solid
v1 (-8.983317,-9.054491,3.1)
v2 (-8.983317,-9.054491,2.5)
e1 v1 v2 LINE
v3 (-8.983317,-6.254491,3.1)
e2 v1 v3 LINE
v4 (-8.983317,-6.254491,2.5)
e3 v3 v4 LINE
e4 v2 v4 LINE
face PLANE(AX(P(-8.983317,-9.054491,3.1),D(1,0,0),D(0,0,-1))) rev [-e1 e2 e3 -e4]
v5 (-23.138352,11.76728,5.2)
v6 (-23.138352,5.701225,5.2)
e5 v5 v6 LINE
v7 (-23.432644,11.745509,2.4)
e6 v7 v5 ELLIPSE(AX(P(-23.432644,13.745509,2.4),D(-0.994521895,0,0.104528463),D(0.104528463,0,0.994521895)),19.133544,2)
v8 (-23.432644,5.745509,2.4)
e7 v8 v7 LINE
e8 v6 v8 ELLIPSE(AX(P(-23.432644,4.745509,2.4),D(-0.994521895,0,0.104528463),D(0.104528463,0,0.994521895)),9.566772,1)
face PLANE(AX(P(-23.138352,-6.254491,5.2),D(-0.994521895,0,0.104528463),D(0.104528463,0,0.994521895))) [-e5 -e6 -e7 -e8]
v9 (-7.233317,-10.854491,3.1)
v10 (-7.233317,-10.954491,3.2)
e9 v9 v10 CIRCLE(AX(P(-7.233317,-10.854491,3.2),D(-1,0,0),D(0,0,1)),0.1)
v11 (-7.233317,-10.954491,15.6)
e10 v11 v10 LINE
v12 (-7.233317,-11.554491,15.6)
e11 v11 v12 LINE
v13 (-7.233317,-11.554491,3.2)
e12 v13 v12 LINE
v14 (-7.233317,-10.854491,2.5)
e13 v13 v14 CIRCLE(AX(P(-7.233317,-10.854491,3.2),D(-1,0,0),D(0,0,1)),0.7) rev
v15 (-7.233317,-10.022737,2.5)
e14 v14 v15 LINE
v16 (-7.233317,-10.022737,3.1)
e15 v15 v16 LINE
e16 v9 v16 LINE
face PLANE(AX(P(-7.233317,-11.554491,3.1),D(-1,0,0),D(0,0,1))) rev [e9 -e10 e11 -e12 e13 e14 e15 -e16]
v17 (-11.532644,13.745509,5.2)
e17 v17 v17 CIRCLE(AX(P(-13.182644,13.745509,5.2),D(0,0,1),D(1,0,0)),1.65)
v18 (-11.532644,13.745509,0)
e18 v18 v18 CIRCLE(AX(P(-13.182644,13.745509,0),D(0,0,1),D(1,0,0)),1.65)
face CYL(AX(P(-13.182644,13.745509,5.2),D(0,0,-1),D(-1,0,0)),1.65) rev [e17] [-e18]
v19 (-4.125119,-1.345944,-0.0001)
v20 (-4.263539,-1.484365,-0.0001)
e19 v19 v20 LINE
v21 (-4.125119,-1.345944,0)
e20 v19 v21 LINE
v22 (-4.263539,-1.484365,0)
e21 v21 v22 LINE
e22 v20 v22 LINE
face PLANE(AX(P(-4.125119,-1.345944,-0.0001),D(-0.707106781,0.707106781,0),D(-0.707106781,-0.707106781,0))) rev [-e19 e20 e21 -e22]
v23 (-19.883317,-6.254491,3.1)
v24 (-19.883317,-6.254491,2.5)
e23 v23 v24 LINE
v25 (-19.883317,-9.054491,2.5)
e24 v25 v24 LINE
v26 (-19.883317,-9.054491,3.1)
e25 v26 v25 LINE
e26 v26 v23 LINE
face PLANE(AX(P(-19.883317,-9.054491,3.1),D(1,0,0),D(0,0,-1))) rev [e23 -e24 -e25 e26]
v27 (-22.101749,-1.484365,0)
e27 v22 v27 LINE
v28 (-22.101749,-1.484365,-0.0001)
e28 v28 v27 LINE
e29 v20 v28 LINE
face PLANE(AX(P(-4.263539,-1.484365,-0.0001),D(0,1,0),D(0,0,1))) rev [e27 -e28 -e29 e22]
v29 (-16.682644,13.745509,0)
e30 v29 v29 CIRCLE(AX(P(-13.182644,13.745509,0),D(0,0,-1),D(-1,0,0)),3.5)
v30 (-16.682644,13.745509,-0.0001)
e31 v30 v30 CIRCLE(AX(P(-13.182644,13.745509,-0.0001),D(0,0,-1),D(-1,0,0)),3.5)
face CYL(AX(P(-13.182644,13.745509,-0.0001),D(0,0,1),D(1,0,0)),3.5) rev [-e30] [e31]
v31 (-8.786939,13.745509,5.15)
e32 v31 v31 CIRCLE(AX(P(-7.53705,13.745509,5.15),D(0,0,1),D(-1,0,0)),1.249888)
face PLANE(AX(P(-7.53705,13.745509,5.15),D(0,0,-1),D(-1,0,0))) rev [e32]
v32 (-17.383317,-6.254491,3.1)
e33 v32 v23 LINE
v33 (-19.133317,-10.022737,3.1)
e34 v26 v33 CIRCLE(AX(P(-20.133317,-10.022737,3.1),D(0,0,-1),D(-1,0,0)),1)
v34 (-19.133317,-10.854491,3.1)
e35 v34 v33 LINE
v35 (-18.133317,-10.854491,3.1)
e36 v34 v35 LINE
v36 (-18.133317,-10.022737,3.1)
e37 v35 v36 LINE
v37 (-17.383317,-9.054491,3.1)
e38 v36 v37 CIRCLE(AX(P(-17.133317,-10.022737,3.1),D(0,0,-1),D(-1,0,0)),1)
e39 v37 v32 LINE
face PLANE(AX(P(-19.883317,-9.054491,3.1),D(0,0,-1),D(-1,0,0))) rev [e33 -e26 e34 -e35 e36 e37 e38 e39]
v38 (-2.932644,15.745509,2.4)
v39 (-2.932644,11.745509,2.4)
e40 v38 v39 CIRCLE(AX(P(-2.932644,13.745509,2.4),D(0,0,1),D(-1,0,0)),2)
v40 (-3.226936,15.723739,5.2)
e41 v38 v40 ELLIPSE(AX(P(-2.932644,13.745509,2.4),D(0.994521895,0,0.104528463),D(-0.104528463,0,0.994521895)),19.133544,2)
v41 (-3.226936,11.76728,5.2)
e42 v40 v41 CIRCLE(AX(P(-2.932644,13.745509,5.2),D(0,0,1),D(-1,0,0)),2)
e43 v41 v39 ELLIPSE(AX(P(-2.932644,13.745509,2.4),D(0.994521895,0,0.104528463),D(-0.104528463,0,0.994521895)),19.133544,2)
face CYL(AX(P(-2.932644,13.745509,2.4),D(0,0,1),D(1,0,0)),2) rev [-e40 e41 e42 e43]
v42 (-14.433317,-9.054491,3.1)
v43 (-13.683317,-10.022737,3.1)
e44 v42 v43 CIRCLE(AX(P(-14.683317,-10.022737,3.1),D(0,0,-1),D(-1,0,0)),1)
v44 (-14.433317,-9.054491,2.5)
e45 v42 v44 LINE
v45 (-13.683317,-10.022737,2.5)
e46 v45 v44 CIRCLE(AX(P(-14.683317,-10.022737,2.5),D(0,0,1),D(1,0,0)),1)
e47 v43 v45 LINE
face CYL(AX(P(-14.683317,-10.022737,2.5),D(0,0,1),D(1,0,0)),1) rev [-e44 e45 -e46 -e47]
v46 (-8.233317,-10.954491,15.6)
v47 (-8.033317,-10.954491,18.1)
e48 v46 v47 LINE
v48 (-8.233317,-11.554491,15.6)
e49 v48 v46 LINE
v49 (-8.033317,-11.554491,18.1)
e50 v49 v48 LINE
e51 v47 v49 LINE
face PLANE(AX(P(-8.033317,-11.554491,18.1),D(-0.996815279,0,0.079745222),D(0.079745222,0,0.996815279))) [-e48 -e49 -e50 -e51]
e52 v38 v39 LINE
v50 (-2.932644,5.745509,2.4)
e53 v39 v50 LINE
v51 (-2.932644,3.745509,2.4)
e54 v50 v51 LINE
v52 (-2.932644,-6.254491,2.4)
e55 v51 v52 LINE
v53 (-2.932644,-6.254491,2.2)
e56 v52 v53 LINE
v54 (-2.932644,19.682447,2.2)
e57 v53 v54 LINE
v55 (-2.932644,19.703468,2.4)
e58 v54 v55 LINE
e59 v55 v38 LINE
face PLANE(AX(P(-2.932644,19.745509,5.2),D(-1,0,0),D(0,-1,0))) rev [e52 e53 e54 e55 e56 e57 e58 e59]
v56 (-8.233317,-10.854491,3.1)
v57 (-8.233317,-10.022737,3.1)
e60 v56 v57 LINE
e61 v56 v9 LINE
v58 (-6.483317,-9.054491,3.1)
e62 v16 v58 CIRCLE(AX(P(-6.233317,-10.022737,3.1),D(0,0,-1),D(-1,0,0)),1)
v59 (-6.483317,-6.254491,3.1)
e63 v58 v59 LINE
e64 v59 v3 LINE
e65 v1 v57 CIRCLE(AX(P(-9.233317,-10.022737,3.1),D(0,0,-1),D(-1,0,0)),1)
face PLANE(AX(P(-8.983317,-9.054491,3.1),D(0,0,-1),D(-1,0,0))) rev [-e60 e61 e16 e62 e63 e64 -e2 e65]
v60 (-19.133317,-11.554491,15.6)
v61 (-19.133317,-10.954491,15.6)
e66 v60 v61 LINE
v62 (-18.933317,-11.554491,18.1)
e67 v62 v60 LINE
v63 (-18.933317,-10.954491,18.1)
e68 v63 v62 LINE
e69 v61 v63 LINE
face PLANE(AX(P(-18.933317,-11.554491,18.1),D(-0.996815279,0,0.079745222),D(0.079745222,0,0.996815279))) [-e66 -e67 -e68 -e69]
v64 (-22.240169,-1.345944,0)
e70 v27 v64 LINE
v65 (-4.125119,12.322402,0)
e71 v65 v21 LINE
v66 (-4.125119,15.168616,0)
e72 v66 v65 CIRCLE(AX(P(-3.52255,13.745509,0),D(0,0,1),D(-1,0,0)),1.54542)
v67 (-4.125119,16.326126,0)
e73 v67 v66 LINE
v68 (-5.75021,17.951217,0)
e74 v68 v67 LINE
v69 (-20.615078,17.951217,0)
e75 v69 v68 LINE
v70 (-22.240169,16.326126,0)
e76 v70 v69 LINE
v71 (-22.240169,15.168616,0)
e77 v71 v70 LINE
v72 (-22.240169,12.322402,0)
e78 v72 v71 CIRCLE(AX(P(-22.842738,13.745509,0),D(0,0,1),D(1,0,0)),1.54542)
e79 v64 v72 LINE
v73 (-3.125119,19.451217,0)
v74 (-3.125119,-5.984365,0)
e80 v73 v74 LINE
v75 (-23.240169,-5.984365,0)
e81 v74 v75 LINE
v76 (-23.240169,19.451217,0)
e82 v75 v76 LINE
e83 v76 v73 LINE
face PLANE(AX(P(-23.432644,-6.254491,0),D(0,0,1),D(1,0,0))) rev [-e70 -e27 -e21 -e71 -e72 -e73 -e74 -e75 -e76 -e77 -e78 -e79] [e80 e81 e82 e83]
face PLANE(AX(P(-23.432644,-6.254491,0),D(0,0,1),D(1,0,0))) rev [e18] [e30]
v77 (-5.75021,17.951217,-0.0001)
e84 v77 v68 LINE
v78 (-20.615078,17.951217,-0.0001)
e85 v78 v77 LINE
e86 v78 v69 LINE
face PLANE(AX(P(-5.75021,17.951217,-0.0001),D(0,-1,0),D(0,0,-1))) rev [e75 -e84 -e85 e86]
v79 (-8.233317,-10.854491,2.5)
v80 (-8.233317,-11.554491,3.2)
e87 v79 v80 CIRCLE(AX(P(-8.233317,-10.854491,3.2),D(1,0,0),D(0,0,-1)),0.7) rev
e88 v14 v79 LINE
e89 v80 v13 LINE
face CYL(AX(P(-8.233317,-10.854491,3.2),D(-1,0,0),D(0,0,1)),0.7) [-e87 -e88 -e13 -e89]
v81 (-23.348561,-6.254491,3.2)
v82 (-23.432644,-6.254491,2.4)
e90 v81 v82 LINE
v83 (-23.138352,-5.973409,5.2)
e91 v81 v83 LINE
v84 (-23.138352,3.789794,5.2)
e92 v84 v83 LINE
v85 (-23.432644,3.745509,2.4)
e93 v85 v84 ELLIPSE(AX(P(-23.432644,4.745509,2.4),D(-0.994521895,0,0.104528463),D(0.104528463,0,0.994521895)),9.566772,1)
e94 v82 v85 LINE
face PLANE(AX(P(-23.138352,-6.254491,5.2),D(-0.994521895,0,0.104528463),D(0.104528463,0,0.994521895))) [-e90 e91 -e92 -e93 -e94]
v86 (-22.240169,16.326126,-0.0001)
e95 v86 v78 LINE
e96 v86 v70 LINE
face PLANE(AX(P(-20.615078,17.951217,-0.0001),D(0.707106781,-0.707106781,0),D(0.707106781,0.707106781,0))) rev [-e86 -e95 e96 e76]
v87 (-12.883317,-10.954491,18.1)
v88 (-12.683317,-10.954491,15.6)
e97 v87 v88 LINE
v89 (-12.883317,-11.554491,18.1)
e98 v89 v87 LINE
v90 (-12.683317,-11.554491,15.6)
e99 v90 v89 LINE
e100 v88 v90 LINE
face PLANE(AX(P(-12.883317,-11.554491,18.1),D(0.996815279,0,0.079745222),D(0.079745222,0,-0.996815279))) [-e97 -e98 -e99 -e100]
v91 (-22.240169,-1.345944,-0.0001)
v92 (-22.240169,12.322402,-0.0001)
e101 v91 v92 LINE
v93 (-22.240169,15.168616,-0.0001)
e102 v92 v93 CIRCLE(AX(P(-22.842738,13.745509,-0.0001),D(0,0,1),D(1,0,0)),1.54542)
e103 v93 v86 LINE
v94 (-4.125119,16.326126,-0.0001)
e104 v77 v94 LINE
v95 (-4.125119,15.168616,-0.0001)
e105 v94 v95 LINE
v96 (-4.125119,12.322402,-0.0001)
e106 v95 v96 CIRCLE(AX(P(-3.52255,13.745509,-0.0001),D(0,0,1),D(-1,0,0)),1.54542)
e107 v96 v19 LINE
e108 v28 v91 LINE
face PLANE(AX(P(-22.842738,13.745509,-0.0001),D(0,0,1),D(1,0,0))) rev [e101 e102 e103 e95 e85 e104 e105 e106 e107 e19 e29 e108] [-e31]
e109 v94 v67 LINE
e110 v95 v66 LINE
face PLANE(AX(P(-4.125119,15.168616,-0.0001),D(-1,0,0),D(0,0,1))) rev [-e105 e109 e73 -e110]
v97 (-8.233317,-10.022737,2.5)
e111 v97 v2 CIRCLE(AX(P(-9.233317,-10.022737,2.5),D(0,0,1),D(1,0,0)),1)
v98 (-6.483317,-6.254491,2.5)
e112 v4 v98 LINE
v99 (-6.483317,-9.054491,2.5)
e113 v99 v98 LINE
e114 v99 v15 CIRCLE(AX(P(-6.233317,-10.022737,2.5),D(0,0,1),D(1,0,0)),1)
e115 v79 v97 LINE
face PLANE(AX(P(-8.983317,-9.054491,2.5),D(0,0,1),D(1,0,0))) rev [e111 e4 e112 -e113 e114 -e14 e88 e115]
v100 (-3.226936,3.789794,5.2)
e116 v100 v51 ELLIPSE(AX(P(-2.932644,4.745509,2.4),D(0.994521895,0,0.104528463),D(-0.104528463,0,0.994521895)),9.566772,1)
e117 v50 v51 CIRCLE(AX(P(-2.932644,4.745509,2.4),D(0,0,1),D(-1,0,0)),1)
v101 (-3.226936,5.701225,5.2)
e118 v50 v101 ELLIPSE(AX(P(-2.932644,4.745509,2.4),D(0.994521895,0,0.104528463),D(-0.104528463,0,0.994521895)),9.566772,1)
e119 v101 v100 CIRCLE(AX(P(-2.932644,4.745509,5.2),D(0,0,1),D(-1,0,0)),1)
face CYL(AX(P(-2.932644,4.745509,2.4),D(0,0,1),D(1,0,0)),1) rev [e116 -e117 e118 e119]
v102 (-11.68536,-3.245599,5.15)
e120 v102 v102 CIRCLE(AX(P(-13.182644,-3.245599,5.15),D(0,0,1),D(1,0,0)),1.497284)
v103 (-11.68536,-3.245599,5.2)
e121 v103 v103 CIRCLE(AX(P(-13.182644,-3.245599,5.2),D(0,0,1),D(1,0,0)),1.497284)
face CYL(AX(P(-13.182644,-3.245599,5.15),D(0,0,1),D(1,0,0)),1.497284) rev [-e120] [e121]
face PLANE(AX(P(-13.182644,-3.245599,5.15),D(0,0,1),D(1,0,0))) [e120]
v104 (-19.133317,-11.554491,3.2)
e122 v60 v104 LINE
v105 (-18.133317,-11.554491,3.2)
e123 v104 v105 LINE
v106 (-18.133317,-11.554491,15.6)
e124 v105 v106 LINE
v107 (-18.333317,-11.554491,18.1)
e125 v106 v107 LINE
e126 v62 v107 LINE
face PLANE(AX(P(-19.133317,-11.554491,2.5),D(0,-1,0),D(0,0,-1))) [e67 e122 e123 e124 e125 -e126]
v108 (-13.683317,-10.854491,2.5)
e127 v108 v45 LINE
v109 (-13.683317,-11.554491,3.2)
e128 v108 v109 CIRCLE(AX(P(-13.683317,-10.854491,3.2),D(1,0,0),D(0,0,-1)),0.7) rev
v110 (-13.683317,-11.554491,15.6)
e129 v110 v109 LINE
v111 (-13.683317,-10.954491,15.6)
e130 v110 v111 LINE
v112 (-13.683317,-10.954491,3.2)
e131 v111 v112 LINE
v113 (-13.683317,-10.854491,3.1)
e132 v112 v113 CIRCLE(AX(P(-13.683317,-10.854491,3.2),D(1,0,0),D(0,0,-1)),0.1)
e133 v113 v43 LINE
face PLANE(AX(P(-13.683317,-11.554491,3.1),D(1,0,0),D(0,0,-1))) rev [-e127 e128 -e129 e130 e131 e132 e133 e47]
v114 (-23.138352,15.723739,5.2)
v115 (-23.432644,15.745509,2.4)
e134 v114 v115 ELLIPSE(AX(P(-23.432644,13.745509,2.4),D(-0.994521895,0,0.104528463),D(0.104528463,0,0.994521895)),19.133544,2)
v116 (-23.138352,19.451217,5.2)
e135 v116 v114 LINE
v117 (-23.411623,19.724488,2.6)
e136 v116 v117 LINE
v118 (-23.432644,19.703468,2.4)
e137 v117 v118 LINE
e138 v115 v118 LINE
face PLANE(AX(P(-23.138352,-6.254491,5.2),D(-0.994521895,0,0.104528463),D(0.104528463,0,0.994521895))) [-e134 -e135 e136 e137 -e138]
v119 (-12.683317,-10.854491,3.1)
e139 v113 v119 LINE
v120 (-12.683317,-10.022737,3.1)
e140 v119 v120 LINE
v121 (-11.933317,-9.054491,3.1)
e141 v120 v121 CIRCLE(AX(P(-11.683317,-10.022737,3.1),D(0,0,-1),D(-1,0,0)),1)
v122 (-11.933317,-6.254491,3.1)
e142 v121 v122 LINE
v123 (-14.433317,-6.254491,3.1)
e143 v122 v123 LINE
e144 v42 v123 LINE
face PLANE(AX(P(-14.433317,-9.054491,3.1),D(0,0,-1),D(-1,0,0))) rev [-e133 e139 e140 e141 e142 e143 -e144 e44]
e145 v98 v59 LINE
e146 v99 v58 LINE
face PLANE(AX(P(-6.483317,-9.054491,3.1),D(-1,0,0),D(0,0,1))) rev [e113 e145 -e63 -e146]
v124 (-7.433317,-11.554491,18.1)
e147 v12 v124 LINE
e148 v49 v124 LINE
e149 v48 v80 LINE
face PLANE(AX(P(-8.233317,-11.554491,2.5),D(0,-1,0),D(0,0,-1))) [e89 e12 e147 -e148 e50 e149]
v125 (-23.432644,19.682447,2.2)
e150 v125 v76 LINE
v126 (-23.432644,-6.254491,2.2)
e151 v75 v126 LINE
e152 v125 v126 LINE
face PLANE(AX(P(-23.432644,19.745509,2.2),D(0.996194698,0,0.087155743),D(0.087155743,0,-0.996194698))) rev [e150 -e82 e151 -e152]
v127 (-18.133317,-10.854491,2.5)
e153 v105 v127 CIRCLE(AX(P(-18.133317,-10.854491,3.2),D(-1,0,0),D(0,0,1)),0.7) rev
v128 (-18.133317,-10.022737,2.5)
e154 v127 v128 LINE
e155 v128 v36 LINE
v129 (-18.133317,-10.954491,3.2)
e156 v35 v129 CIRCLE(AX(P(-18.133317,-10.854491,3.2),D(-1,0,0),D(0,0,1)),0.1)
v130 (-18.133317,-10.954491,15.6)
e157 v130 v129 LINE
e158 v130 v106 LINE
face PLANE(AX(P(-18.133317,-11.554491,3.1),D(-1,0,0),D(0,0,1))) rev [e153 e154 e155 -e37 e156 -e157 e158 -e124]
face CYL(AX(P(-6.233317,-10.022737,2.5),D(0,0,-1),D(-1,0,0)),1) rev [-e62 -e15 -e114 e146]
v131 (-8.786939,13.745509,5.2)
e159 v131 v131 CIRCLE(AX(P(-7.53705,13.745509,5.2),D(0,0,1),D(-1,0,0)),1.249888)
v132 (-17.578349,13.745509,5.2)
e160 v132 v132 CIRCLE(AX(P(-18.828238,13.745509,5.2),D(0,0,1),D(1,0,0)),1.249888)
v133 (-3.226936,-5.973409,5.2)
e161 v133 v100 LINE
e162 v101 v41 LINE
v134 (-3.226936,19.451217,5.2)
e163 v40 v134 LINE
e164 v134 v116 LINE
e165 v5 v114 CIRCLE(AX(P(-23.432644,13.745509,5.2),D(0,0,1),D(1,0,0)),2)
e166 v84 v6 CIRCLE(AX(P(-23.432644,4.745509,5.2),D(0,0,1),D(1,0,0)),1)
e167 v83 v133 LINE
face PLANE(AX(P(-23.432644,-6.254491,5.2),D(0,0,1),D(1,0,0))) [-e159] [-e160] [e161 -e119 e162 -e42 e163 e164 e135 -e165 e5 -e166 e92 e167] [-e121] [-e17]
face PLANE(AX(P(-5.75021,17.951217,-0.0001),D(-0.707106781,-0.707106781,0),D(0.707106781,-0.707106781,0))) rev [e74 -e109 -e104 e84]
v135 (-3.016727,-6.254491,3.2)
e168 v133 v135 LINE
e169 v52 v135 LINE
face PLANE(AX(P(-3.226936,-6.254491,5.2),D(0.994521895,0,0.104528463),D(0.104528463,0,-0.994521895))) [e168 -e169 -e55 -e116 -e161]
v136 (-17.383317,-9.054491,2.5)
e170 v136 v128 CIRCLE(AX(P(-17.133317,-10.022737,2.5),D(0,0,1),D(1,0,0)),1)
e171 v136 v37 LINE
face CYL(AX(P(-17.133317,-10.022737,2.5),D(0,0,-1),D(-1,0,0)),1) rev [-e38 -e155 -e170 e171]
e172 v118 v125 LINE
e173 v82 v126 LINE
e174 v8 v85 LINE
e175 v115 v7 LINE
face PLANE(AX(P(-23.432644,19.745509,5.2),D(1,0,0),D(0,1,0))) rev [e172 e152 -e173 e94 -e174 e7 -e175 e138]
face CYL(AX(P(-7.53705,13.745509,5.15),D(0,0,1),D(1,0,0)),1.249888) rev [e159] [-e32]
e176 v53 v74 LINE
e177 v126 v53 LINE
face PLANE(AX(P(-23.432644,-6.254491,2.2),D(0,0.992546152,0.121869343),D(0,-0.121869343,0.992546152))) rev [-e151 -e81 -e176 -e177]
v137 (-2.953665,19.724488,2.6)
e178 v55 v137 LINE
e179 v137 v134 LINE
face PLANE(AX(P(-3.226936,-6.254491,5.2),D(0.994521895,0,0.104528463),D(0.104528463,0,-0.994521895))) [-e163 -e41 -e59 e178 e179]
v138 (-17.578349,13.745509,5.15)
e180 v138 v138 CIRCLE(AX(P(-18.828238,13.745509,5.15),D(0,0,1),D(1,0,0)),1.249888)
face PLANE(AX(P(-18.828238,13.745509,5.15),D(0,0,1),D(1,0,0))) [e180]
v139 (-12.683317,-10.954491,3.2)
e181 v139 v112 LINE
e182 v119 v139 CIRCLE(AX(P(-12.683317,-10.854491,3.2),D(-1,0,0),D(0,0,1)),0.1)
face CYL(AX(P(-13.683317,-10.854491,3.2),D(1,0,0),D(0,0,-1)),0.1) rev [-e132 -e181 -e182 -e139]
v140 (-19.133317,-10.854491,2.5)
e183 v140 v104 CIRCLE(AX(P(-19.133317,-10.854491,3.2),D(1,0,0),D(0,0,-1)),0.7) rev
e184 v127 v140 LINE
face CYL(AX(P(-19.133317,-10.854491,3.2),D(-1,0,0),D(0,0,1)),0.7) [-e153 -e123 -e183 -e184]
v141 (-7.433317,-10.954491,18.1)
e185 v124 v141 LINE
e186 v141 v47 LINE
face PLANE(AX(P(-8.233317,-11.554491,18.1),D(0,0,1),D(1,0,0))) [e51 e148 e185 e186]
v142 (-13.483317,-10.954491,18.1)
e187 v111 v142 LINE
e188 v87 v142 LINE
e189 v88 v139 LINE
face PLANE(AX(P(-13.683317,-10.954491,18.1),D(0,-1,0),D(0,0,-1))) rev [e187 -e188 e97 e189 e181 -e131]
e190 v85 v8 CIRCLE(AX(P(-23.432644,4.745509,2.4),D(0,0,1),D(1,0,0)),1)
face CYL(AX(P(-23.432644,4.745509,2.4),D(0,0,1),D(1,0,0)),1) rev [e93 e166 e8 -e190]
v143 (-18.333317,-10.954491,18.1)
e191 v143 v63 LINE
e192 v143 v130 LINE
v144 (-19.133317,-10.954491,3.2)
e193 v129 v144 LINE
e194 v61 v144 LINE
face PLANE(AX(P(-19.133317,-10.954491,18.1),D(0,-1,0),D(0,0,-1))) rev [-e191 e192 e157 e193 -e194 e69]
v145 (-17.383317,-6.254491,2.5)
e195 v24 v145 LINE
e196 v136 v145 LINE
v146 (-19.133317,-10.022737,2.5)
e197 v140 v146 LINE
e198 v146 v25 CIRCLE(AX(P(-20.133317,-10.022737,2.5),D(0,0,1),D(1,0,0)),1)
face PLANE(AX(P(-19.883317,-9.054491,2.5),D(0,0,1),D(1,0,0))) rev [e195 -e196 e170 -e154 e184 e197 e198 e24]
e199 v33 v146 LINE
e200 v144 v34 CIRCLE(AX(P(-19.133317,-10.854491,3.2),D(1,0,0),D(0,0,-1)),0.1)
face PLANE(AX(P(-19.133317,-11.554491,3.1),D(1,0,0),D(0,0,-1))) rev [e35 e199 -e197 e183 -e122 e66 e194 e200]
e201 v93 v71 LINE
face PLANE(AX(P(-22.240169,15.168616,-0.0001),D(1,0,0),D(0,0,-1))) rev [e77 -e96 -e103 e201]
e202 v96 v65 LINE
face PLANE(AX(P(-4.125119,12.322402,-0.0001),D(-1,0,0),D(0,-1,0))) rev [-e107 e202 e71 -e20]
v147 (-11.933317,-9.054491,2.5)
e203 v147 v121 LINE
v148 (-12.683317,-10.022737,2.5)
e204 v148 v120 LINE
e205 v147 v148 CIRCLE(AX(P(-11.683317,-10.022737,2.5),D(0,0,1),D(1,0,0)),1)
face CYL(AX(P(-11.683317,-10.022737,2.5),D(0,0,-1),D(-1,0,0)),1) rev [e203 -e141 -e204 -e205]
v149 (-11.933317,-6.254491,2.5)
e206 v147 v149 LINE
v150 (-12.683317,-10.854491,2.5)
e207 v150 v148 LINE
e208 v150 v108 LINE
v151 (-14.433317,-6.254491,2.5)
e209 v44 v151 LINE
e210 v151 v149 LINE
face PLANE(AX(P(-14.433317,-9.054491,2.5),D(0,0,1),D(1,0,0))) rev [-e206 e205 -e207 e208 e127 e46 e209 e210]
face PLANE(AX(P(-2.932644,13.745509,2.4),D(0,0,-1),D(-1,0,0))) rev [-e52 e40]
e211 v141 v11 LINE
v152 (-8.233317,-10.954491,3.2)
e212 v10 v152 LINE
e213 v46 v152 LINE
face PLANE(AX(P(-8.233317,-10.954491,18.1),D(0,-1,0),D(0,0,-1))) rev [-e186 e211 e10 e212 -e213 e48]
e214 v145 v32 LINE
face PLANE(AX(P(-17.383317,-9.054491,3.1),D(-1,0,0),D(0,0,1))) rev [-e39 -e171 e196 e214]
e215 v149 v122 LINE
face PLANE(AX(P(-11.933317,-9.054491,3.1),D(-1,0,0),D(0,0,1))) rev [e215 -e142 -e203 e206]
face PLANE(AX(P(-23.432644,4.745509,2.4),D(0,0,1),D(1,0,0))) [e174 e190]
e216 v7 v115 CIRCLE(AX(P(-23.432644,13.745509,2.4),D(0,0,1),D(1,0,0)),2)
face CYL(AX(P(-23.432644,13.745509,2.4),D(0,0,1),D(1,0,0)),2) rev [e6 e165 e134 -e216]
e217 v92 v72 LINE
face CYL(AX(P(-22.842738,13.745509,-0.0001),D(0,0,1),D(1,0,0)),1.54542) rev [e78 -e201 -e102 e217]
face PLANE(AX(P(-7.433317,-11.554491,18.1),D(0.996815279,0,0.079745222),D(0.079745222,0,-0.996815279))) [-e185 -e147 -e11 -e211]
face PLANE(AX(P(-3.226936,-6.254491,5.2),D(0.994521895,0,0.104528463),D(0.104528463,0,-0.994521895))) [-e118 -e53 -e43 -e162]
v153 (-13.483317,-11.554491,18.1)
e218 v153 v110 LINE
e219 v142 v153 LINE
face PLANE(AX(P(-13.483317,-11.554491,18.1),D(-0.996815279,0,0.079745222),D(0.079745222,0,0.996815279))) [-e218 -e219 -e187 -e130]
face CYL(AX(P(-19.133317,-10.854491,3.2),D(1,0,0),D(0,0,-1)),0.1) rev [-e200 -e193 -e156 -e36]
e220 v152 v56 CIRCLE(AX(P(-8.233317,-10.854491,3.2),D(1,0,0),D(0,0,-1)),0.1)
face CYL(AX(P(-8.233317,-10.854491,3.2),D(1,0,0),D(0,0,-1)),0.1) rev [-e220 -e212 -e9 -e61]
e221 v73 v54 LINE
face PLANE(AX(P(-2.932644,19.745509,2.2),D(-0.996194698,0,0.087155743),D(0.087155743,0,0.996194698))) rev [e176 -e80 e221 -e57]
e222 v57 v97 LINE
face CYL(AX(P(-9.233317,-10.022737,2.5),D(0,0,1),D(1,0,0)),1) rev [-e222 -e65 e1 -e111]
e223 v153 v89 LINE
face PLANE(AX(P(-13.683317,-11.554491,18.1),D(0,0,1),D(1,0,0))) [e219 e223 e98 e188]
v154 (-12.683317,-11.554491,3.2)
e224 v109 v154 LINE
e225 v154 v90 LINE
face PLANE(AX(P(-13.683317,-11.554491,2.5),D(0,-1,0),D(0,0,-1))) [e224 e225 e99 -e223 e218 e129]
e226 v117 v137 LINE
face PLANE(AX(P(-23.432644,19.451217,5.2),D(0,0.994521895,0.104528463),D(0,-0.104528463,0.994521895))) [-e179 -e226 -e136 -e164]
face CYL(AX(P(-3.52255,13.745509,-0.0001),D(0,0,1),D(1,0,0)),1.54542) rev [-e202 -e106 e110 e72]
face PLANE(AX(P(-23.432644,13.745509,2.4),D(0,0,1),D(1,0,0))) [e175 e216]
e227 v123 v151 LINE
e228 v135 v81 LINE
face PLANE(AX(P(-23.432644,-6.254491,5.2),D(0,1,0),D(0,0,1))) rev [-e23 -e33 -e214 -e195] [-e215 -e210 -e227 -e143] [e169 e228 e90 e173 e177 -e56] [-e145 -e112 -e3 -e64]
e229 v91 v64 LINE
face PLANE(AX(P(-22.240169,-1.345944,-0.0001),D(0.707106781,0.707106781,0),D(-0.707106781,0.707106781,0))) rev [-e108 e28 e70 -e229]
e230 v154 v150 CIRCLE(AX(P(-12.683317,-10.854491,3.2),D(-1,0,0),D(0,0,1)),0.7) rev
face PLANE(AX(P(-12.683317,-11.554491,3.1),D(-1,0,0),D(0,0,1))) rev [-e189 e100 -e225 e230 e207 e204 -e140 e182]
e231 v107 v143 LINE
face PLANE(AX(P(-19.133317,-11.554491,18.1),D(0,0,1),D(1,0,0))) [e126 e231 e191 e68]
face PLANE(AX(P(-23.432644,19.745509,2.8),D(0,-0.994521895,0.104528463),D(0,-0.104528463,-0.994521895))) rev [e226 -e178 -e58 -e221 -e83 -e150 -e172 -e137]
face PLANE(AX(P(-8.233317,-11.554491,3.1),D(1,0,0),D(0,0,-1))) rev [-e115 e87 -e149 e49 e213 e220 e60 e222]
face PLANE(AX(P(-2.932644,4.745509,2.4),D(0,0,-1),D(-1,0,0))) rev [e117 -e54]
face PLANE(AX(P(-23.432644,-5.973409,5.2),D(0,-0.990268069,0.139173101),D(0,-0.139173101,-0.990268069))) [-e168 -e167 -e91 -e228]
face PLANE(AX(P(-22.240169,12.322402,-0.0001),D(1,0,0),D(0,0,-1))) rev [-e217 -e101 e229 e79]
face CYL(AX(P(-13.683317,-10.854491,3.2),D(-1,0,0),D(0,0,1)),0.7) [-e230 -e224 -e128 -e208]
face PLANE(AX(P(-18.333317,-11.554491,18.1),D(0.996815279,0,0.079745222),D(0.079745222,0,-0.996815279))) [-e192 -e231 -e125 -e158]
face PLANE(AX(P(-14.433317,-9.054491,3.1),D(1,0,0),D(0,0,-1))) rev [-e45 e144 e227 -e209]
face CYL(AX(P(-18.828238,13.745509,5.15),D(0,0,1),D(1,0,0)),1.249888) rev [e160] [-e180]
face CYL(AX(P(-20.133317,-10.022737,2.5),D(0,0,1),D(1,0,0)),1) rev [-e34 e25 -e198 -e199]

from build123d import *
from OCP.BRepFilletAPI import BRepFilletAPI_MakeChamfer

# Parameters (mm, degrees)
SZKIC1_W                                = 20.5
SZKIC1_H                                = 26
SZKIC1_R                                = 1.65
DODANIE_WYCI_GNI_CIE1_DEPTH             = 5.2
SZKIC2_R                                = 2
SZKIC2_R_2                              = 1
WYTNIJ_WYCI_GNI_CIE1_DEPTH              = 2.8
SZKIC4_W                                = 2.5
SZKIC4_H                                = 0.6
DODANIE_WYCI_GNI_CIE2_DEPTH             = 2.8
SZKIC7_W                                = 1
SZKIC7_H                                = 0.6
DODANIE_WYCI_GNI_CIE3_DEPTH             = 2.5
ZAOKR_GLENIE2_R                         = 1
SFAZOWANIE3_SIZE                        = 2.2
SFAZOWANIE3_SIZE2                       = 0.19247506
SFAZOWANIE4_SIZE                        = 2.8
SFAZOWANIE4_SIZE2                       = 0.294291859
SFAZOWANIE5_SIZE                        = 0.294291859
SFAZOWANIE5_SIZE_2                      = 2.8
SFAZOWANIE6_SIZE                        = 2.2
SFAZOWANIE6_SIZE2                       = 0.270126034
SFAZOWANIE7_SIZE                        = 2
SFAZOWANIE7_SIZE2                       = 0.281081669
SKETCH_1_W                              = 1
SKETCH_1_H                              = 0.6
EXTRUDE_1_DEPTH                         = 15
FILLET_1_R                              = 0.1
FILLET_2_R                              = 0.7
CHAMFER_1_SIZE                          = 2.5
CHAMFER_1_SIZE2                         = 0.2
PATTERN_LINEAR_9_COUNT                  = 2
PATTERN_LINEAR_9_PITCH                  = 5.45
ZAOKR_GLENIE2_OF_PATTERN_LINEAR_9_R     = 1
FILLET_1_OF_PATTERN_LINEAR_9_R          = 0.1
FILLET_2_OF_PATTERN_LINEAR_9_R          = 0.7
CHAMFER_1_OF_PATTERN_LINEAR_9_SIZE      = 2.5
CHAMFER_1_OF_PATTERN_LINEAR_9_SIZE2     = 0.2
PATTERN_LINEAR_9_COL_COUNT              = 2
PATTERN_LINEAR_9_COL_PITCH              = 5.45
ZAOKR_GLENIE2_OF_PATTERN_LINEAR_9_COL_R = 1
FILLET_1_OF_PATTERN_LINEAR_9_COL_R      = 0.1
FILLET_2_OF_PATTERN_LINEAR_9_COL_R      = 0.7
CHAMFER_1_OF_PATTERN_LINEAR_9_COL_SIZE  = 2.5
CHAMFER_1_OF_PATTERN_LINEAR_9_COL_SIZE2 = 0.2
SKETCH_4_R                              = 3.5
EXTRUDE_3_DEPTH                         = 0.0001
SKETCH_5_R                              = 1.249888398
SKETCH_5_R_2                            = 1.497284422
CUT_EXTRUDE_1_DEPTH                     = 0.05


with BuildPart() as part:
    # Szkic1 → Dodanie-wyciągnięcie1 (new body)
    with BuildSketch(Plane.XY):
        with Locations((-13.182644045, 6.74550931)):
            Rectangle(SZKIC1_W, SZKIC1_H)
        with Locations((-13.182644045, 13.74550931)):
            Circle(SZKIC1_R, mode=Mode.SUBTRACT)
    extrude(amount=DODANIE_WYCI_GNI_CIE1_DEPTH)

    # Szkic2 → Wytnij-wyciągnięcie1 (cut)
    with BuildSketch(Plane.XY.offset(5.2)):
        with Locations((-23.432644045, 13.74550931)):
            Circle(SZKIC2_R)
        with Locations((-2.932644045, 13.74550931)):
            Circle(SZKIC2_R)
        with Locations((-23.432644045, 4.74550931)):
            Circle(SZKIC2_R_2)
        with Locations((-2.932644045, 4.74550931)):
            Circle(SZKIC2_R_2)
    extrude(amount=-WYTNIJ_WYCI_GNI_CIE1_DEPTH, mode=Mode.SUBTRACT)

    # Szkic4 → Dodanie-wyciągnięcie2 (add)
    with BuildSketch(Plane.XZ.offset(6.25449069)):
        with Locations((-13.183317029, 2.8)):
            Rectangle(SZKIC4_W, SZKIC4_H)
    dodanie_wyci_gni_cie2 = extrude(amount=DODANIE_WYCI_GNI_CIE2_DEPTH)

    # Szkic7 → Dodanie-wyciągnięcie3 (add)
    with BuildSketch(Plane.XZ.offset(9.05449069)):
        with Locations((-13.183317029, 2.8)):
            Rectangle(SZKIC7_W, SZKIC7_H)
    dodanie_wyci_gni_cie3 = extrude(amount=DODANIE_WYCI_GNI_CIE3_DEPTH)

    # Zaokrąglenie2
    # the kernel refuses this fillet: 1 mm, written as the material it adds along each edge
    with BuildSketch(Plane(origin=(-13.683317029, -9.05449069, 2.5), x_dir=(-1, 0, 0), z_dir=(0, 0, 1)), Plane(origin=(-12.683317029, -9.05449069, 3.1), x_dir=(1, 0, 0), z_dir=(0, 0, -1))) as zaokr_glenie2_piece_1:
        with BuildLine():
            CenterArc((1, 0.968245837), ZAOKR_GLENIE2_R, 180, 75.522487814)
            Line((0, 0.968245837), (-0.02, 0.968245837))
            Line((-0.02, 0.968245837), (-0.02, 0))
            Line((-0.02, 0), (0, -0.02))
            ThreePointArc((0, -0.02), (0.375, -0.02), (0.745, -0.019364917))
            Line((0.745, -0.019364917), (0.75, 0))
        make_face()
    extrude(amount=0.6)

    # Sfazowanie3: one chamfer whose edges measure the first distance from different faces: ONE call of the kernel's chamfer builder (chamfer() names one face for all edges)
    sfazowanie3_edges_1 = [part.edges().sort_by_distance(p)[0] for p in [
        (-2.932644045, 6.74550931, 0),
    ]]
    sfazowanie3_side_1 = [part.faces().sort_by_distance(p)[0] for p in [
        (-2.932644045, 6.177941742, 2.42972973),
    ]]
    sfazowanie3_edges_2 = [part.edges().sort_by_distance(p)[0] for p in [
        (-23.432644045, 6.74550931, 0),
    ]]
    sfazowanie3_side_2 = [part.faces().sort_by_distance(p)[0] for p in [
        (-23.432644045, 6.177941742, 2.42972973),
    ]]
    sfazowanie3 = BRepFilletAPI_MakeChamfer(part.part.solid().wrapped)
    for e in sfazowanie3_edges_1:
        sfazowanie3.Add(SFAZOWANIE3_SIZE, SFAZOWANIE3_SIZE2, e.wrapped, sfazowanie3_side_1[0].wrapped)  # the first distance lies on this face
    for e in sfazowanie3_edges_2:
        sfazowanie3.Add(SFAZOWANIE3_SIZE, SFAZOWANIE3_SIZE2, e.wrapped, sfazowanie3_side_2[0].wrapped)  # the first distance lies on this face
    add(Compound.cast(sfazowanie3.Shape()), mode=Mode.REPLACE)

    # Sfazowanie4: one chamfer whose edges measure the first distance from different faces: ONE call of the kernel's chamfer builder (chamfer() names one face for all edges)
    sfazowanie4_edges_1 = [part.edges().sort_by_distance(p)[0] for p in [
        (-2.932644045, -1.25449069, 5.2),
        (-2.932644045, 8.74550931, 5.2),
        (-2.932644045, 17.74550931, 5.2),
    ]]
    sfazowanie4_side_1 = [part.faces().sort_by_distance(p)[0] for p in [
        (-2.932644045, -5.992765643, 3.7),
    ]]
    sfazowanie4_edges_2 = [part.edges().sort_by_distance(p)[0] for p in [
        (-23.432644045, 17.74550931, 5.2),
        (-23.432644045, -1.25449069, 5.2),
        (-23.432644045, 8.74550931, 5.2),
    ]]
    sfazowanie4_side_2 = [part.faces().sort_by_distance(p)[0] for p in [
        (-23.432644045, 19.483784263, 3.7),
    ]]
    sfazowanie4 = BRepFilletAPI_MakeChamfer(part.part.solid().wrapped)
    for e in sfazowanie4_edges_1:
        sfazowanie4.Add(SFAZOWANIE4_SIZE, SFAZOWANIE4_SIZE2, e.wrapped, sfazowanie4_side_1[0].wrapped)  # the first distance lies on this face
    for e in sfazowanie4_edges_2:
        sfazowanie4.Add(SFAZOWANIE4_SIZE, SFAZOWANIE4_SIZE2, e.wrapped, sfazowanie4_side_2[0].wrapped)  # the first distance lies on this face
    add(Compound.cast(sfazowanie4.Shape()), mode=Mode.REPLACE)

    # Sfazowanie5
    # the kernel refuses this chamfer: 2.8, 0.294291859 mm, written as the material it takes off along each edge
    with BuildSketch(Plane(origin=(-30.518693961, 19.74550931, 0), x_dir=(0, -0.9396808679591201, -0.3420524322258136), z_dir=(1, 0, 0))) as sfazowanie5_piece_1:
        Polygon((SFAZOWANIE5_SIZE * 0.939680867141, -SFAZOWANIE5_SIZE * 0.342052431928), (-SFAZOWANIE5_SIZE_2 * 0.342052432226, -SFAZOWANIE5_SIZE_2 * 0.939680867959), (0, 0), align=None)
    extrude(amount=34.672099833, mode=Mode.SUBTRACT)
    with BuildSketch(Plane(origin=(-30.416877162, 19.74550931, 5.2), x_dir=(0, -0.9396808679591199, 0.34205243222581383), z_dir=(1, 0, 0))) as sfazowanie5_piece_2:
        Polygon((SFAZOWANIE5_SIZE * 0.939680867141, SFAZOWANIE5_SIZE * 0.342052431928), (-SFAZOWANIE5_SIZE_2 * 0.342052432226, SFAZOWANIE5_SIZE_2 * 0.939680867959), (0, 0), align=None)
    extrude(amount=34.468466235, mode=Mode.SUBTRACT)

    # Sfazowanie6
    sfazowanie6_edges = [part.edges().sort_by_distance(p)[0] for p in [
        (-13.182644045, -6.25449069, 0),
    ]]
    sfazowanie6_side = [part.faces().sort_by_distance(p)[0] for p in [
        (-3.144136362, -6.25449069, 2.3),
    ]]
    chamfer(sfazowanie6_edges, length=SFAZOWANIE6_SIZE, length2=SFAZOWANIE6_SIZE2, reference=sfazowanie6_side[0])

    # Sfazowanie7
    sfazowanie7_edges = [part.edges().sort_by_distance(p)[0] for p in [
        (-13.182644045, -6.25449069, 5.2),
    ]]
    sfazowanie7_side = [part.faces().sort_by_distance(p)[0] for p in [
        (-13.182626986, -6.25449069, 3.714922556),
    ]]
    chamfer(sfazowanie7_edges, length=SFAZOWANIE7_SIZE, length2=SFAZOWANIE7_SIZE2, reference=sfazowanie7_side[0])

    # 草图1 → 凸台-拉伸1 (add)
    with BuildSketch(Plane.XY.offset(3.1)):
        with Locations((-13.183317029, -11.25449069)):
            Rectangle(SKETCH_1_W, SKETCH_1_H)
    extrude_1 = extrude(amount=EXTRUDE_1_DEPTH)

    # 圆角1
    fillet_1_edges = [part.edges().sort_by_distance(p)[0] for p in [
        (-13.183317029, -10.95449069, 3.1),
    ]]
    fillet(fillet_1_edges, radius=FILLET_1_R)

    # 圆角2
    fillet_2_edges = [part.edges().sort_by_distance(p)[0] for p in [
        (-13.183317029, -11.55449069, 2.5),
    ]]
    fillet(fillet_2_edges, radius=FILLET_2_R)

    # 倒角1: one chamfer whose edges measure the first distance from different faces: ONE call of the kernel's chamfer builder (chamfer() names one face for all edges)
    chamfer_1_edges_1 = [part.edges().sort_by_distance(p)[0] for p in [
        (-13.683317029, -11.25449069, 18.1),
    ]]
    chamfer_1_side_1 = [part.faces().sort_by_distance(p)[0] for p in [
        (-13.683317029, -11.209262494, 9.953166713),
    ]]
    chamfer_1_edges_2 = [part.edges().sort_by_distance(p)[0] for p in [
        (-12.683317029, -11.25449069, 18.1),
    ]]
    chamfer_1_side_2 = [part.faces().sort_by_distance(p)[0] for p in [
        (-12.683317029, -11.209262494, 9.953166713),
    ]]
    chamfer_1 = BRepFilletAPI_MakeChamfer(part.part.solid().wrapped)
    for e in chamfer_1_edges_1:
        chamfer_1.Add(CHAMFER_1_SIZE, CHAMFER_1_SIZE2, e.wrapped, chamfer_1_side_1[0].wrapped)  # the first distance lies on this face
    for e in chamfer_1_edges_2:
        chamfer_1.Add(CHAMFER_1_SIZE, CHAMFER_1_SIZE2, e.wrapped, chamfer_1_side_2[0].wrapped)  # the first distance lies on this face
    add(Compound.cast(chamfer_1.Shape()), mode=Mode.REPLACE)

    # 阵列(线性)9: Dodanie-wyciągnięcie2, Dodanie-wyciągnięcie3, 凸台-拉伸1 ×2
    with Locations(*[(i * PATTERN_LINEAR_9_PITCH, 0, 0) for i in range(1, PATTERN_LINEAR_9_COUNT)]):
        add(dodanie_wyci_gni_cie2)
        add(dodanie_wyci_gni_cie3)
        add(extrude_1)

    # Zaokrąglenie2 of 阵列(线性)9
    # the kernel refuses this fillet: 1 mm, written as the material it adds along each edge
    with BuildSketch(Plane(origin=(-8.233317029, -9.05449069, 2.5), x_dir=(-1, 0, 0), z_dir=(0, 0, 1))) as zaokr_glenie2_of_pattern_linear_9_piece_1:
        with BuildLine():
            CenterArc((1, 0.968245837), ZAOKR_GLENIE2_OF_PATTERN_LINEAR_9_R, 180, 75.522487814)
            Line((0, 0.968245837), (-0.02, 0.968245837))
            Line((-0.02, 0.968245837), (-0.02, 0))
            Line((-0.02, 0), (0, -0.02))
            ThreePointArc((0, -0.02), (0.375, -0.02), (0.745, -0.019364917))
            Line((0.745, -0.019364917), (0.75, 0))
        make_face()
    extrude(amount=0.6)
    with BuildSketch(Plane(origin=(-7.233317029, -9.05449069, 3.1), x_dir=(0, -1, 0), z_dir=(0, 0, -1))) as zaokr_glenie2_of_pattern_linear_9_piece_2:
        with BuildLine():
            CenterArc((0.968245837, -1), ZAOKR_GLENIE2_OF_PATTERN_LINEAR_9_R, 90, 75.522487814)
            Line((0, -0.75), (-0.019364917, -0.745))
            ThreePointArc((-0.019364917, -0.745), (-0.02, -0.375), (-0.02, 0))
            Line((-0.02, 0), (0, 0.02))
            Line((0, 0.02), (0.968245837, 0.02))
            Line((0.968245837, 0.02), (0.968245837, 0))
        make_face()
    extrude(amount=0.6)

    # 圆角1 of 阵列(线性)9
    fillet_1_of_pattern_linear_9_edges = [part.edges().sort_by_distance(p)[0] for p in [
        (-7.733317029, -10.95449069, 3.1),
    ]]
    fillet(fillet_1_of_pattern_linear_9_edges, radius=FILLET_1_OF_PATTERN_LINEAR_9_R)

    # 圆角2 of 阵列(线性)9
    fillet_2_of_pattern_linear_9_edges = [part.edges().sort_by_distance(p)[0] for p in [
        (-7.733317029, -11.55449069, 2.5),
    ]]
    fillet(fillet_2_of_pattern_linear_9_edges, radius=FILLET_2_OF_PATTERN_LINEAR_9_R)

    # 倒角1 of 阵列(线性)9: one chamfer whose edges measure the first distance from different faces: ONE call of the kernel's chamfer builder (chamfer() names one face for all edges)
    chamfer_1_of_pattern_linear_9_edges_1 = [part.edges().sort_by_distance(p)[0] for p in [
        (-8.233317029, -11.25449069, 18.1),
    ]]
    chamfer_1_of_pattern_linear_9_side_1 = [part.faces().sort_by_distance(p)[0] for p in [
        (-8.233317029, -11.209262494, 9.953166713),
    ]]
    chamfer_1_of_pattern_linear_9_edges_2 = [part.edges().sort_by_distance(p)[0] for p in [
        (-7.233317029, -11.25449069, 18.1),
    ]]
    chamfer_1_of_pattern_linear_9_side_2 = [part.faces().sort_by_distance(p)[0] for p in [
        (-7.233317029, -11.209262494, 9.953166713),
    ]]
    chamfer_1_of_pattern_linear_9 = BRepFilletAPI_MakeChamfer(part.part.solid().wrapped)
    for e in chamfer_1_of_pattern_linear_9_edges_1:
        chamfer_1_of_pattern_linear_9.Add(CHAMFER_1_OF_PATTERN_LINEAR_9_SIZE, CHAMFER_1_OF_PATTERN_LINEAR_9_SIZE2, e.wrapped, chamfer_1_of_pattern_linear_9_side_1[0].wrapped)  # the first distance lies on this face
    for e in chamfer_1_of_pattern_linear_9_edges_2:
        chamfer_1_of_pattern_linear_9.Add(CHAMFER_1_OF_PATTERN_LINEAR_9_SIZE, CHAMFER_1_OF_PATTERN_LINEAR_9_SIZE2, e.wrapped, chamfer_1_of_pattern_linear_9_side_2[0].wrapped)  # the first distance lies on this face
    add(Compound.cast(chamfer_1_of_pattern_linear_9.Shape()), mode=Mode.REPLACE)

    # 阵列(线性)9 col: Dodanie-wyciągnięcie2, Dodanie-wyciągnięcie3, 凸台-拉伸1 ×2
    with Locations(*[(-i * PATTERN_LINEAR_9_COL_PITCH, 0, 0) for i in range(1, PATTERN_LINEAR_9_COL_COUNT)]):
        add(dodanie_wyci_gni_cie2)
        add(dodanie_wyci_gni_cie3)
        add(extrude_1)

    # Zaokrąglenie2 of 阵列(线性)9 col
    # the kernel refuses this fillet: 1 mm, written as the material it adds along each edge
    with BuildSketch(Plane(origin=(-19.133317029, -9.05449069, 2.5), x_dir=(-1, 0, 0), z_dir=(0, 0, 1))) as zaokr_glenie2_of_pattern_linear_9_col_piece_1:
        with BuildLine():
            CenterArc((1, 0.968245837), ZAOKR_GLENIE2_OF_PATTERN_LINEAR_9_COL_R, 180, 75.522487814)
            Line((0, 0.968245837), (-0.02, 0.968245837))
            Line((-0.02, 0.968245837), (-0.02, 0))
            Line((-0.02, 0), (0, -0.02))
            ThreePointArc((0, -0.02), (0.375, -0.02), (0.745, -0.019364917))
            Line((0.745, -0.019364917), (0.75, 0))
        make_face()
    extrude(amount=0.6)
    with BuildSketch(Plane(origin=(-18.133317029, -9.05449069, 3.1), x_dir=(0, -1, 0), z_dir=(0, 0, -1))) as zaokr_glenie2_of_pattern_linear_9_col_piece_2:
        with BuildLine():
            CenterArc((0.968245837, -1), ZAOKR_GLENIE2_OF_PATTERN_LINEAR_9_COL_R, 90, 75.522487814)
            Line((0, -0.75), (-0.019364917, -0.745))
            ThreePointArc((-0.019364917, -0.745), (-0.02, -0.375), (-0.02, 0))
            Line((-0.02, 0), (0, 0.02))
            Line((0, 0.02), (0.968245837, 0.02))
            Line((0.968245837, 0.02), (0.968245837, 0))
        make_face()
    extrude(amount=0.6)

    # 圆角1 of 阵列(线性)9 col
    fillet_1_of_pattern_linear_9_col_edges = [part.edges().sort_by_distance(p)[0] for p in [
        (-18.633317029, -10.95449069, 3.1),
    ]]
    fillet(fillet_1_of_pattern_linear_9_col_edges, radius=FILLET_1_OF_PATTERN_LINEAR_9_COL_R)

    # 圆角2 of 阵列(线性)9 col
    fillet_2_of_pattern_linear_9_col_edges = [part.edges().sort_by_distance(p)[0] for p in [
        (-18.633317029, -11.55449069, 2.5),
    ]]
    fillet(fillet_2_of_pattern_linear_9_col_edges, radius=FILLET_2_OF_PATTERN_LINEAR_9_COL_R)

    # 倒角1 of 阵列(线性)9 col: one chamfer whose edges measure the first distance from different faces: ONE call of the kernel's chamfer builder (chamfer() names one face for all edges)
    chamfer_1_of_pattern_linear_9_col_edges_1 = [part.edges().sort_by_distance(p)[0] for p in [
        (-19.133317029, -11.25449069, 18.1),
    ]]
    chamfer_1_of_pattern_linear_9_col_side_1 = [part.faces().sort_by_distance(p)[0] for p in [
        (-19.133317029, -11.209262494, 9.953166713),
    ]]
    chamfer_1_of_pattern_linear_9_col_edges_2 = [part.edges().sort_by_distance(p)[0] for p in [
        (-18.133317029, -11.25449069, 18.1),
    ]]
    chamfer_1_of_pattern_linear_9_col_side_2 = [part.faces().sort_by_distance(p)[0] for p in [
        (-18.133317029, -11.209262494, 9.953166713),
    ]]
    chamfer_1_of_pattern_linear_9_col = BRepFilletAPI_MakeChamfer(part.part.solid().wrapped)
    for e in chamfer_1_of_pattern_linear_9_col_edges_1:
        chamfer_1_of_pattern_linear_9_col.Add(CHAMFER_1_OF_PATTERN_LINEAR_9_COL_SIZE, CHAMFER_1_OF_PATTERN_LINEAR_9_COL_SIZE2, e.wrapped, chamfer_1_of_pattern_linear_9_col_side_1[0].wrapped)  # the first distance lies on this face
    for e in chamfer_1_of_pattern_linear_9_col_edges_2:
        chamfer_1_of_pattern_linear_9_col.Add(CHAMFER_1_OF_PATTERN_LINEAR_9_COL_SIZE, CHAMFER_1_OF_PATTERN_LINEAR_9_COL_SIZE2, e.wrapped, chamfer_1_of_pattern_linear_9_col_side_2[0].wrapped)  # the first distance lies on this face
    add(Compound.cast(chamfer_1_of_pattern_linear_9_col.Shape()), mode=Mode.REPLACE)

    # 草图4 → 凸台-拉伸3 (add)
    with BuildSketch(Plane(origin=(0, 0, 0), x_dir=(-1, 0, 0), z_dir=(0, 0, -1))):
        with BuildLine():
            Line((5.750210339, 17.951217451), (4.125119105, 16.326126217))
            Line((4.125119105, 16.326126217), (4.125119105, 15.168616255))
            ThreePointArc((4.125119105, 15.168616255), (5.067970026, 13.74550931), (4.125119105, 12.322402365))
            Line((4.125119105, 12.322402365), (4.125119105, -1.345944481))
            Line((4.125119105, -1.345944481), (4.26353928, -1.484364656))
            Line((4.26353928, -1.484364656), (22.10174881, -1.484364656))
            Line((22.10174881, -1.484364656), (22.240168985, -1.345944481))
            Line((22.240168985, -1.345944481), (22.240168985, 12.322402365))
            ThreePointArc((22.240168985, 12.322402365), (21.297318064, 13.74550931), (22.240168985, 15.168616255))
            Line((22.240168985, 15.168616255), (22.240168985, 16.326126217))
            Line((22.240168985, 16.326126217), (20.615077751, 17.951217451))
            Line((20.615077751, 17.951217451), (5.750210339, 17.951217451))
        make_face()
        with Locations((13.182644045, 13.74550931)):
            Circle(SKETCH_4_R, mode=Mode.SUBTRACT)
    extrude(amount=EXTRUDE_3_DEPTH)

    # 草图5 → 切除-拉伸1 (cut)
    with BuildSketch(Plane.XY.offset(5.2)):
        with Locations(Location((-7.537050492, 13.74550931, 0), (0, 0, 180))):
            Circle(SKETCH_5_R)
        with Locations((-18.828237598, 13.74550931)):
            Circle(SKETCH_5_R)
        with Locations((-13.182644045, -3.245598745)):
            Circle(SKETCH_5_R_2)
    extrude(amount=-CUT_EXTRUDE_1_DEPTH, mode=Mode.SUBTRACT)


solid = part.part
